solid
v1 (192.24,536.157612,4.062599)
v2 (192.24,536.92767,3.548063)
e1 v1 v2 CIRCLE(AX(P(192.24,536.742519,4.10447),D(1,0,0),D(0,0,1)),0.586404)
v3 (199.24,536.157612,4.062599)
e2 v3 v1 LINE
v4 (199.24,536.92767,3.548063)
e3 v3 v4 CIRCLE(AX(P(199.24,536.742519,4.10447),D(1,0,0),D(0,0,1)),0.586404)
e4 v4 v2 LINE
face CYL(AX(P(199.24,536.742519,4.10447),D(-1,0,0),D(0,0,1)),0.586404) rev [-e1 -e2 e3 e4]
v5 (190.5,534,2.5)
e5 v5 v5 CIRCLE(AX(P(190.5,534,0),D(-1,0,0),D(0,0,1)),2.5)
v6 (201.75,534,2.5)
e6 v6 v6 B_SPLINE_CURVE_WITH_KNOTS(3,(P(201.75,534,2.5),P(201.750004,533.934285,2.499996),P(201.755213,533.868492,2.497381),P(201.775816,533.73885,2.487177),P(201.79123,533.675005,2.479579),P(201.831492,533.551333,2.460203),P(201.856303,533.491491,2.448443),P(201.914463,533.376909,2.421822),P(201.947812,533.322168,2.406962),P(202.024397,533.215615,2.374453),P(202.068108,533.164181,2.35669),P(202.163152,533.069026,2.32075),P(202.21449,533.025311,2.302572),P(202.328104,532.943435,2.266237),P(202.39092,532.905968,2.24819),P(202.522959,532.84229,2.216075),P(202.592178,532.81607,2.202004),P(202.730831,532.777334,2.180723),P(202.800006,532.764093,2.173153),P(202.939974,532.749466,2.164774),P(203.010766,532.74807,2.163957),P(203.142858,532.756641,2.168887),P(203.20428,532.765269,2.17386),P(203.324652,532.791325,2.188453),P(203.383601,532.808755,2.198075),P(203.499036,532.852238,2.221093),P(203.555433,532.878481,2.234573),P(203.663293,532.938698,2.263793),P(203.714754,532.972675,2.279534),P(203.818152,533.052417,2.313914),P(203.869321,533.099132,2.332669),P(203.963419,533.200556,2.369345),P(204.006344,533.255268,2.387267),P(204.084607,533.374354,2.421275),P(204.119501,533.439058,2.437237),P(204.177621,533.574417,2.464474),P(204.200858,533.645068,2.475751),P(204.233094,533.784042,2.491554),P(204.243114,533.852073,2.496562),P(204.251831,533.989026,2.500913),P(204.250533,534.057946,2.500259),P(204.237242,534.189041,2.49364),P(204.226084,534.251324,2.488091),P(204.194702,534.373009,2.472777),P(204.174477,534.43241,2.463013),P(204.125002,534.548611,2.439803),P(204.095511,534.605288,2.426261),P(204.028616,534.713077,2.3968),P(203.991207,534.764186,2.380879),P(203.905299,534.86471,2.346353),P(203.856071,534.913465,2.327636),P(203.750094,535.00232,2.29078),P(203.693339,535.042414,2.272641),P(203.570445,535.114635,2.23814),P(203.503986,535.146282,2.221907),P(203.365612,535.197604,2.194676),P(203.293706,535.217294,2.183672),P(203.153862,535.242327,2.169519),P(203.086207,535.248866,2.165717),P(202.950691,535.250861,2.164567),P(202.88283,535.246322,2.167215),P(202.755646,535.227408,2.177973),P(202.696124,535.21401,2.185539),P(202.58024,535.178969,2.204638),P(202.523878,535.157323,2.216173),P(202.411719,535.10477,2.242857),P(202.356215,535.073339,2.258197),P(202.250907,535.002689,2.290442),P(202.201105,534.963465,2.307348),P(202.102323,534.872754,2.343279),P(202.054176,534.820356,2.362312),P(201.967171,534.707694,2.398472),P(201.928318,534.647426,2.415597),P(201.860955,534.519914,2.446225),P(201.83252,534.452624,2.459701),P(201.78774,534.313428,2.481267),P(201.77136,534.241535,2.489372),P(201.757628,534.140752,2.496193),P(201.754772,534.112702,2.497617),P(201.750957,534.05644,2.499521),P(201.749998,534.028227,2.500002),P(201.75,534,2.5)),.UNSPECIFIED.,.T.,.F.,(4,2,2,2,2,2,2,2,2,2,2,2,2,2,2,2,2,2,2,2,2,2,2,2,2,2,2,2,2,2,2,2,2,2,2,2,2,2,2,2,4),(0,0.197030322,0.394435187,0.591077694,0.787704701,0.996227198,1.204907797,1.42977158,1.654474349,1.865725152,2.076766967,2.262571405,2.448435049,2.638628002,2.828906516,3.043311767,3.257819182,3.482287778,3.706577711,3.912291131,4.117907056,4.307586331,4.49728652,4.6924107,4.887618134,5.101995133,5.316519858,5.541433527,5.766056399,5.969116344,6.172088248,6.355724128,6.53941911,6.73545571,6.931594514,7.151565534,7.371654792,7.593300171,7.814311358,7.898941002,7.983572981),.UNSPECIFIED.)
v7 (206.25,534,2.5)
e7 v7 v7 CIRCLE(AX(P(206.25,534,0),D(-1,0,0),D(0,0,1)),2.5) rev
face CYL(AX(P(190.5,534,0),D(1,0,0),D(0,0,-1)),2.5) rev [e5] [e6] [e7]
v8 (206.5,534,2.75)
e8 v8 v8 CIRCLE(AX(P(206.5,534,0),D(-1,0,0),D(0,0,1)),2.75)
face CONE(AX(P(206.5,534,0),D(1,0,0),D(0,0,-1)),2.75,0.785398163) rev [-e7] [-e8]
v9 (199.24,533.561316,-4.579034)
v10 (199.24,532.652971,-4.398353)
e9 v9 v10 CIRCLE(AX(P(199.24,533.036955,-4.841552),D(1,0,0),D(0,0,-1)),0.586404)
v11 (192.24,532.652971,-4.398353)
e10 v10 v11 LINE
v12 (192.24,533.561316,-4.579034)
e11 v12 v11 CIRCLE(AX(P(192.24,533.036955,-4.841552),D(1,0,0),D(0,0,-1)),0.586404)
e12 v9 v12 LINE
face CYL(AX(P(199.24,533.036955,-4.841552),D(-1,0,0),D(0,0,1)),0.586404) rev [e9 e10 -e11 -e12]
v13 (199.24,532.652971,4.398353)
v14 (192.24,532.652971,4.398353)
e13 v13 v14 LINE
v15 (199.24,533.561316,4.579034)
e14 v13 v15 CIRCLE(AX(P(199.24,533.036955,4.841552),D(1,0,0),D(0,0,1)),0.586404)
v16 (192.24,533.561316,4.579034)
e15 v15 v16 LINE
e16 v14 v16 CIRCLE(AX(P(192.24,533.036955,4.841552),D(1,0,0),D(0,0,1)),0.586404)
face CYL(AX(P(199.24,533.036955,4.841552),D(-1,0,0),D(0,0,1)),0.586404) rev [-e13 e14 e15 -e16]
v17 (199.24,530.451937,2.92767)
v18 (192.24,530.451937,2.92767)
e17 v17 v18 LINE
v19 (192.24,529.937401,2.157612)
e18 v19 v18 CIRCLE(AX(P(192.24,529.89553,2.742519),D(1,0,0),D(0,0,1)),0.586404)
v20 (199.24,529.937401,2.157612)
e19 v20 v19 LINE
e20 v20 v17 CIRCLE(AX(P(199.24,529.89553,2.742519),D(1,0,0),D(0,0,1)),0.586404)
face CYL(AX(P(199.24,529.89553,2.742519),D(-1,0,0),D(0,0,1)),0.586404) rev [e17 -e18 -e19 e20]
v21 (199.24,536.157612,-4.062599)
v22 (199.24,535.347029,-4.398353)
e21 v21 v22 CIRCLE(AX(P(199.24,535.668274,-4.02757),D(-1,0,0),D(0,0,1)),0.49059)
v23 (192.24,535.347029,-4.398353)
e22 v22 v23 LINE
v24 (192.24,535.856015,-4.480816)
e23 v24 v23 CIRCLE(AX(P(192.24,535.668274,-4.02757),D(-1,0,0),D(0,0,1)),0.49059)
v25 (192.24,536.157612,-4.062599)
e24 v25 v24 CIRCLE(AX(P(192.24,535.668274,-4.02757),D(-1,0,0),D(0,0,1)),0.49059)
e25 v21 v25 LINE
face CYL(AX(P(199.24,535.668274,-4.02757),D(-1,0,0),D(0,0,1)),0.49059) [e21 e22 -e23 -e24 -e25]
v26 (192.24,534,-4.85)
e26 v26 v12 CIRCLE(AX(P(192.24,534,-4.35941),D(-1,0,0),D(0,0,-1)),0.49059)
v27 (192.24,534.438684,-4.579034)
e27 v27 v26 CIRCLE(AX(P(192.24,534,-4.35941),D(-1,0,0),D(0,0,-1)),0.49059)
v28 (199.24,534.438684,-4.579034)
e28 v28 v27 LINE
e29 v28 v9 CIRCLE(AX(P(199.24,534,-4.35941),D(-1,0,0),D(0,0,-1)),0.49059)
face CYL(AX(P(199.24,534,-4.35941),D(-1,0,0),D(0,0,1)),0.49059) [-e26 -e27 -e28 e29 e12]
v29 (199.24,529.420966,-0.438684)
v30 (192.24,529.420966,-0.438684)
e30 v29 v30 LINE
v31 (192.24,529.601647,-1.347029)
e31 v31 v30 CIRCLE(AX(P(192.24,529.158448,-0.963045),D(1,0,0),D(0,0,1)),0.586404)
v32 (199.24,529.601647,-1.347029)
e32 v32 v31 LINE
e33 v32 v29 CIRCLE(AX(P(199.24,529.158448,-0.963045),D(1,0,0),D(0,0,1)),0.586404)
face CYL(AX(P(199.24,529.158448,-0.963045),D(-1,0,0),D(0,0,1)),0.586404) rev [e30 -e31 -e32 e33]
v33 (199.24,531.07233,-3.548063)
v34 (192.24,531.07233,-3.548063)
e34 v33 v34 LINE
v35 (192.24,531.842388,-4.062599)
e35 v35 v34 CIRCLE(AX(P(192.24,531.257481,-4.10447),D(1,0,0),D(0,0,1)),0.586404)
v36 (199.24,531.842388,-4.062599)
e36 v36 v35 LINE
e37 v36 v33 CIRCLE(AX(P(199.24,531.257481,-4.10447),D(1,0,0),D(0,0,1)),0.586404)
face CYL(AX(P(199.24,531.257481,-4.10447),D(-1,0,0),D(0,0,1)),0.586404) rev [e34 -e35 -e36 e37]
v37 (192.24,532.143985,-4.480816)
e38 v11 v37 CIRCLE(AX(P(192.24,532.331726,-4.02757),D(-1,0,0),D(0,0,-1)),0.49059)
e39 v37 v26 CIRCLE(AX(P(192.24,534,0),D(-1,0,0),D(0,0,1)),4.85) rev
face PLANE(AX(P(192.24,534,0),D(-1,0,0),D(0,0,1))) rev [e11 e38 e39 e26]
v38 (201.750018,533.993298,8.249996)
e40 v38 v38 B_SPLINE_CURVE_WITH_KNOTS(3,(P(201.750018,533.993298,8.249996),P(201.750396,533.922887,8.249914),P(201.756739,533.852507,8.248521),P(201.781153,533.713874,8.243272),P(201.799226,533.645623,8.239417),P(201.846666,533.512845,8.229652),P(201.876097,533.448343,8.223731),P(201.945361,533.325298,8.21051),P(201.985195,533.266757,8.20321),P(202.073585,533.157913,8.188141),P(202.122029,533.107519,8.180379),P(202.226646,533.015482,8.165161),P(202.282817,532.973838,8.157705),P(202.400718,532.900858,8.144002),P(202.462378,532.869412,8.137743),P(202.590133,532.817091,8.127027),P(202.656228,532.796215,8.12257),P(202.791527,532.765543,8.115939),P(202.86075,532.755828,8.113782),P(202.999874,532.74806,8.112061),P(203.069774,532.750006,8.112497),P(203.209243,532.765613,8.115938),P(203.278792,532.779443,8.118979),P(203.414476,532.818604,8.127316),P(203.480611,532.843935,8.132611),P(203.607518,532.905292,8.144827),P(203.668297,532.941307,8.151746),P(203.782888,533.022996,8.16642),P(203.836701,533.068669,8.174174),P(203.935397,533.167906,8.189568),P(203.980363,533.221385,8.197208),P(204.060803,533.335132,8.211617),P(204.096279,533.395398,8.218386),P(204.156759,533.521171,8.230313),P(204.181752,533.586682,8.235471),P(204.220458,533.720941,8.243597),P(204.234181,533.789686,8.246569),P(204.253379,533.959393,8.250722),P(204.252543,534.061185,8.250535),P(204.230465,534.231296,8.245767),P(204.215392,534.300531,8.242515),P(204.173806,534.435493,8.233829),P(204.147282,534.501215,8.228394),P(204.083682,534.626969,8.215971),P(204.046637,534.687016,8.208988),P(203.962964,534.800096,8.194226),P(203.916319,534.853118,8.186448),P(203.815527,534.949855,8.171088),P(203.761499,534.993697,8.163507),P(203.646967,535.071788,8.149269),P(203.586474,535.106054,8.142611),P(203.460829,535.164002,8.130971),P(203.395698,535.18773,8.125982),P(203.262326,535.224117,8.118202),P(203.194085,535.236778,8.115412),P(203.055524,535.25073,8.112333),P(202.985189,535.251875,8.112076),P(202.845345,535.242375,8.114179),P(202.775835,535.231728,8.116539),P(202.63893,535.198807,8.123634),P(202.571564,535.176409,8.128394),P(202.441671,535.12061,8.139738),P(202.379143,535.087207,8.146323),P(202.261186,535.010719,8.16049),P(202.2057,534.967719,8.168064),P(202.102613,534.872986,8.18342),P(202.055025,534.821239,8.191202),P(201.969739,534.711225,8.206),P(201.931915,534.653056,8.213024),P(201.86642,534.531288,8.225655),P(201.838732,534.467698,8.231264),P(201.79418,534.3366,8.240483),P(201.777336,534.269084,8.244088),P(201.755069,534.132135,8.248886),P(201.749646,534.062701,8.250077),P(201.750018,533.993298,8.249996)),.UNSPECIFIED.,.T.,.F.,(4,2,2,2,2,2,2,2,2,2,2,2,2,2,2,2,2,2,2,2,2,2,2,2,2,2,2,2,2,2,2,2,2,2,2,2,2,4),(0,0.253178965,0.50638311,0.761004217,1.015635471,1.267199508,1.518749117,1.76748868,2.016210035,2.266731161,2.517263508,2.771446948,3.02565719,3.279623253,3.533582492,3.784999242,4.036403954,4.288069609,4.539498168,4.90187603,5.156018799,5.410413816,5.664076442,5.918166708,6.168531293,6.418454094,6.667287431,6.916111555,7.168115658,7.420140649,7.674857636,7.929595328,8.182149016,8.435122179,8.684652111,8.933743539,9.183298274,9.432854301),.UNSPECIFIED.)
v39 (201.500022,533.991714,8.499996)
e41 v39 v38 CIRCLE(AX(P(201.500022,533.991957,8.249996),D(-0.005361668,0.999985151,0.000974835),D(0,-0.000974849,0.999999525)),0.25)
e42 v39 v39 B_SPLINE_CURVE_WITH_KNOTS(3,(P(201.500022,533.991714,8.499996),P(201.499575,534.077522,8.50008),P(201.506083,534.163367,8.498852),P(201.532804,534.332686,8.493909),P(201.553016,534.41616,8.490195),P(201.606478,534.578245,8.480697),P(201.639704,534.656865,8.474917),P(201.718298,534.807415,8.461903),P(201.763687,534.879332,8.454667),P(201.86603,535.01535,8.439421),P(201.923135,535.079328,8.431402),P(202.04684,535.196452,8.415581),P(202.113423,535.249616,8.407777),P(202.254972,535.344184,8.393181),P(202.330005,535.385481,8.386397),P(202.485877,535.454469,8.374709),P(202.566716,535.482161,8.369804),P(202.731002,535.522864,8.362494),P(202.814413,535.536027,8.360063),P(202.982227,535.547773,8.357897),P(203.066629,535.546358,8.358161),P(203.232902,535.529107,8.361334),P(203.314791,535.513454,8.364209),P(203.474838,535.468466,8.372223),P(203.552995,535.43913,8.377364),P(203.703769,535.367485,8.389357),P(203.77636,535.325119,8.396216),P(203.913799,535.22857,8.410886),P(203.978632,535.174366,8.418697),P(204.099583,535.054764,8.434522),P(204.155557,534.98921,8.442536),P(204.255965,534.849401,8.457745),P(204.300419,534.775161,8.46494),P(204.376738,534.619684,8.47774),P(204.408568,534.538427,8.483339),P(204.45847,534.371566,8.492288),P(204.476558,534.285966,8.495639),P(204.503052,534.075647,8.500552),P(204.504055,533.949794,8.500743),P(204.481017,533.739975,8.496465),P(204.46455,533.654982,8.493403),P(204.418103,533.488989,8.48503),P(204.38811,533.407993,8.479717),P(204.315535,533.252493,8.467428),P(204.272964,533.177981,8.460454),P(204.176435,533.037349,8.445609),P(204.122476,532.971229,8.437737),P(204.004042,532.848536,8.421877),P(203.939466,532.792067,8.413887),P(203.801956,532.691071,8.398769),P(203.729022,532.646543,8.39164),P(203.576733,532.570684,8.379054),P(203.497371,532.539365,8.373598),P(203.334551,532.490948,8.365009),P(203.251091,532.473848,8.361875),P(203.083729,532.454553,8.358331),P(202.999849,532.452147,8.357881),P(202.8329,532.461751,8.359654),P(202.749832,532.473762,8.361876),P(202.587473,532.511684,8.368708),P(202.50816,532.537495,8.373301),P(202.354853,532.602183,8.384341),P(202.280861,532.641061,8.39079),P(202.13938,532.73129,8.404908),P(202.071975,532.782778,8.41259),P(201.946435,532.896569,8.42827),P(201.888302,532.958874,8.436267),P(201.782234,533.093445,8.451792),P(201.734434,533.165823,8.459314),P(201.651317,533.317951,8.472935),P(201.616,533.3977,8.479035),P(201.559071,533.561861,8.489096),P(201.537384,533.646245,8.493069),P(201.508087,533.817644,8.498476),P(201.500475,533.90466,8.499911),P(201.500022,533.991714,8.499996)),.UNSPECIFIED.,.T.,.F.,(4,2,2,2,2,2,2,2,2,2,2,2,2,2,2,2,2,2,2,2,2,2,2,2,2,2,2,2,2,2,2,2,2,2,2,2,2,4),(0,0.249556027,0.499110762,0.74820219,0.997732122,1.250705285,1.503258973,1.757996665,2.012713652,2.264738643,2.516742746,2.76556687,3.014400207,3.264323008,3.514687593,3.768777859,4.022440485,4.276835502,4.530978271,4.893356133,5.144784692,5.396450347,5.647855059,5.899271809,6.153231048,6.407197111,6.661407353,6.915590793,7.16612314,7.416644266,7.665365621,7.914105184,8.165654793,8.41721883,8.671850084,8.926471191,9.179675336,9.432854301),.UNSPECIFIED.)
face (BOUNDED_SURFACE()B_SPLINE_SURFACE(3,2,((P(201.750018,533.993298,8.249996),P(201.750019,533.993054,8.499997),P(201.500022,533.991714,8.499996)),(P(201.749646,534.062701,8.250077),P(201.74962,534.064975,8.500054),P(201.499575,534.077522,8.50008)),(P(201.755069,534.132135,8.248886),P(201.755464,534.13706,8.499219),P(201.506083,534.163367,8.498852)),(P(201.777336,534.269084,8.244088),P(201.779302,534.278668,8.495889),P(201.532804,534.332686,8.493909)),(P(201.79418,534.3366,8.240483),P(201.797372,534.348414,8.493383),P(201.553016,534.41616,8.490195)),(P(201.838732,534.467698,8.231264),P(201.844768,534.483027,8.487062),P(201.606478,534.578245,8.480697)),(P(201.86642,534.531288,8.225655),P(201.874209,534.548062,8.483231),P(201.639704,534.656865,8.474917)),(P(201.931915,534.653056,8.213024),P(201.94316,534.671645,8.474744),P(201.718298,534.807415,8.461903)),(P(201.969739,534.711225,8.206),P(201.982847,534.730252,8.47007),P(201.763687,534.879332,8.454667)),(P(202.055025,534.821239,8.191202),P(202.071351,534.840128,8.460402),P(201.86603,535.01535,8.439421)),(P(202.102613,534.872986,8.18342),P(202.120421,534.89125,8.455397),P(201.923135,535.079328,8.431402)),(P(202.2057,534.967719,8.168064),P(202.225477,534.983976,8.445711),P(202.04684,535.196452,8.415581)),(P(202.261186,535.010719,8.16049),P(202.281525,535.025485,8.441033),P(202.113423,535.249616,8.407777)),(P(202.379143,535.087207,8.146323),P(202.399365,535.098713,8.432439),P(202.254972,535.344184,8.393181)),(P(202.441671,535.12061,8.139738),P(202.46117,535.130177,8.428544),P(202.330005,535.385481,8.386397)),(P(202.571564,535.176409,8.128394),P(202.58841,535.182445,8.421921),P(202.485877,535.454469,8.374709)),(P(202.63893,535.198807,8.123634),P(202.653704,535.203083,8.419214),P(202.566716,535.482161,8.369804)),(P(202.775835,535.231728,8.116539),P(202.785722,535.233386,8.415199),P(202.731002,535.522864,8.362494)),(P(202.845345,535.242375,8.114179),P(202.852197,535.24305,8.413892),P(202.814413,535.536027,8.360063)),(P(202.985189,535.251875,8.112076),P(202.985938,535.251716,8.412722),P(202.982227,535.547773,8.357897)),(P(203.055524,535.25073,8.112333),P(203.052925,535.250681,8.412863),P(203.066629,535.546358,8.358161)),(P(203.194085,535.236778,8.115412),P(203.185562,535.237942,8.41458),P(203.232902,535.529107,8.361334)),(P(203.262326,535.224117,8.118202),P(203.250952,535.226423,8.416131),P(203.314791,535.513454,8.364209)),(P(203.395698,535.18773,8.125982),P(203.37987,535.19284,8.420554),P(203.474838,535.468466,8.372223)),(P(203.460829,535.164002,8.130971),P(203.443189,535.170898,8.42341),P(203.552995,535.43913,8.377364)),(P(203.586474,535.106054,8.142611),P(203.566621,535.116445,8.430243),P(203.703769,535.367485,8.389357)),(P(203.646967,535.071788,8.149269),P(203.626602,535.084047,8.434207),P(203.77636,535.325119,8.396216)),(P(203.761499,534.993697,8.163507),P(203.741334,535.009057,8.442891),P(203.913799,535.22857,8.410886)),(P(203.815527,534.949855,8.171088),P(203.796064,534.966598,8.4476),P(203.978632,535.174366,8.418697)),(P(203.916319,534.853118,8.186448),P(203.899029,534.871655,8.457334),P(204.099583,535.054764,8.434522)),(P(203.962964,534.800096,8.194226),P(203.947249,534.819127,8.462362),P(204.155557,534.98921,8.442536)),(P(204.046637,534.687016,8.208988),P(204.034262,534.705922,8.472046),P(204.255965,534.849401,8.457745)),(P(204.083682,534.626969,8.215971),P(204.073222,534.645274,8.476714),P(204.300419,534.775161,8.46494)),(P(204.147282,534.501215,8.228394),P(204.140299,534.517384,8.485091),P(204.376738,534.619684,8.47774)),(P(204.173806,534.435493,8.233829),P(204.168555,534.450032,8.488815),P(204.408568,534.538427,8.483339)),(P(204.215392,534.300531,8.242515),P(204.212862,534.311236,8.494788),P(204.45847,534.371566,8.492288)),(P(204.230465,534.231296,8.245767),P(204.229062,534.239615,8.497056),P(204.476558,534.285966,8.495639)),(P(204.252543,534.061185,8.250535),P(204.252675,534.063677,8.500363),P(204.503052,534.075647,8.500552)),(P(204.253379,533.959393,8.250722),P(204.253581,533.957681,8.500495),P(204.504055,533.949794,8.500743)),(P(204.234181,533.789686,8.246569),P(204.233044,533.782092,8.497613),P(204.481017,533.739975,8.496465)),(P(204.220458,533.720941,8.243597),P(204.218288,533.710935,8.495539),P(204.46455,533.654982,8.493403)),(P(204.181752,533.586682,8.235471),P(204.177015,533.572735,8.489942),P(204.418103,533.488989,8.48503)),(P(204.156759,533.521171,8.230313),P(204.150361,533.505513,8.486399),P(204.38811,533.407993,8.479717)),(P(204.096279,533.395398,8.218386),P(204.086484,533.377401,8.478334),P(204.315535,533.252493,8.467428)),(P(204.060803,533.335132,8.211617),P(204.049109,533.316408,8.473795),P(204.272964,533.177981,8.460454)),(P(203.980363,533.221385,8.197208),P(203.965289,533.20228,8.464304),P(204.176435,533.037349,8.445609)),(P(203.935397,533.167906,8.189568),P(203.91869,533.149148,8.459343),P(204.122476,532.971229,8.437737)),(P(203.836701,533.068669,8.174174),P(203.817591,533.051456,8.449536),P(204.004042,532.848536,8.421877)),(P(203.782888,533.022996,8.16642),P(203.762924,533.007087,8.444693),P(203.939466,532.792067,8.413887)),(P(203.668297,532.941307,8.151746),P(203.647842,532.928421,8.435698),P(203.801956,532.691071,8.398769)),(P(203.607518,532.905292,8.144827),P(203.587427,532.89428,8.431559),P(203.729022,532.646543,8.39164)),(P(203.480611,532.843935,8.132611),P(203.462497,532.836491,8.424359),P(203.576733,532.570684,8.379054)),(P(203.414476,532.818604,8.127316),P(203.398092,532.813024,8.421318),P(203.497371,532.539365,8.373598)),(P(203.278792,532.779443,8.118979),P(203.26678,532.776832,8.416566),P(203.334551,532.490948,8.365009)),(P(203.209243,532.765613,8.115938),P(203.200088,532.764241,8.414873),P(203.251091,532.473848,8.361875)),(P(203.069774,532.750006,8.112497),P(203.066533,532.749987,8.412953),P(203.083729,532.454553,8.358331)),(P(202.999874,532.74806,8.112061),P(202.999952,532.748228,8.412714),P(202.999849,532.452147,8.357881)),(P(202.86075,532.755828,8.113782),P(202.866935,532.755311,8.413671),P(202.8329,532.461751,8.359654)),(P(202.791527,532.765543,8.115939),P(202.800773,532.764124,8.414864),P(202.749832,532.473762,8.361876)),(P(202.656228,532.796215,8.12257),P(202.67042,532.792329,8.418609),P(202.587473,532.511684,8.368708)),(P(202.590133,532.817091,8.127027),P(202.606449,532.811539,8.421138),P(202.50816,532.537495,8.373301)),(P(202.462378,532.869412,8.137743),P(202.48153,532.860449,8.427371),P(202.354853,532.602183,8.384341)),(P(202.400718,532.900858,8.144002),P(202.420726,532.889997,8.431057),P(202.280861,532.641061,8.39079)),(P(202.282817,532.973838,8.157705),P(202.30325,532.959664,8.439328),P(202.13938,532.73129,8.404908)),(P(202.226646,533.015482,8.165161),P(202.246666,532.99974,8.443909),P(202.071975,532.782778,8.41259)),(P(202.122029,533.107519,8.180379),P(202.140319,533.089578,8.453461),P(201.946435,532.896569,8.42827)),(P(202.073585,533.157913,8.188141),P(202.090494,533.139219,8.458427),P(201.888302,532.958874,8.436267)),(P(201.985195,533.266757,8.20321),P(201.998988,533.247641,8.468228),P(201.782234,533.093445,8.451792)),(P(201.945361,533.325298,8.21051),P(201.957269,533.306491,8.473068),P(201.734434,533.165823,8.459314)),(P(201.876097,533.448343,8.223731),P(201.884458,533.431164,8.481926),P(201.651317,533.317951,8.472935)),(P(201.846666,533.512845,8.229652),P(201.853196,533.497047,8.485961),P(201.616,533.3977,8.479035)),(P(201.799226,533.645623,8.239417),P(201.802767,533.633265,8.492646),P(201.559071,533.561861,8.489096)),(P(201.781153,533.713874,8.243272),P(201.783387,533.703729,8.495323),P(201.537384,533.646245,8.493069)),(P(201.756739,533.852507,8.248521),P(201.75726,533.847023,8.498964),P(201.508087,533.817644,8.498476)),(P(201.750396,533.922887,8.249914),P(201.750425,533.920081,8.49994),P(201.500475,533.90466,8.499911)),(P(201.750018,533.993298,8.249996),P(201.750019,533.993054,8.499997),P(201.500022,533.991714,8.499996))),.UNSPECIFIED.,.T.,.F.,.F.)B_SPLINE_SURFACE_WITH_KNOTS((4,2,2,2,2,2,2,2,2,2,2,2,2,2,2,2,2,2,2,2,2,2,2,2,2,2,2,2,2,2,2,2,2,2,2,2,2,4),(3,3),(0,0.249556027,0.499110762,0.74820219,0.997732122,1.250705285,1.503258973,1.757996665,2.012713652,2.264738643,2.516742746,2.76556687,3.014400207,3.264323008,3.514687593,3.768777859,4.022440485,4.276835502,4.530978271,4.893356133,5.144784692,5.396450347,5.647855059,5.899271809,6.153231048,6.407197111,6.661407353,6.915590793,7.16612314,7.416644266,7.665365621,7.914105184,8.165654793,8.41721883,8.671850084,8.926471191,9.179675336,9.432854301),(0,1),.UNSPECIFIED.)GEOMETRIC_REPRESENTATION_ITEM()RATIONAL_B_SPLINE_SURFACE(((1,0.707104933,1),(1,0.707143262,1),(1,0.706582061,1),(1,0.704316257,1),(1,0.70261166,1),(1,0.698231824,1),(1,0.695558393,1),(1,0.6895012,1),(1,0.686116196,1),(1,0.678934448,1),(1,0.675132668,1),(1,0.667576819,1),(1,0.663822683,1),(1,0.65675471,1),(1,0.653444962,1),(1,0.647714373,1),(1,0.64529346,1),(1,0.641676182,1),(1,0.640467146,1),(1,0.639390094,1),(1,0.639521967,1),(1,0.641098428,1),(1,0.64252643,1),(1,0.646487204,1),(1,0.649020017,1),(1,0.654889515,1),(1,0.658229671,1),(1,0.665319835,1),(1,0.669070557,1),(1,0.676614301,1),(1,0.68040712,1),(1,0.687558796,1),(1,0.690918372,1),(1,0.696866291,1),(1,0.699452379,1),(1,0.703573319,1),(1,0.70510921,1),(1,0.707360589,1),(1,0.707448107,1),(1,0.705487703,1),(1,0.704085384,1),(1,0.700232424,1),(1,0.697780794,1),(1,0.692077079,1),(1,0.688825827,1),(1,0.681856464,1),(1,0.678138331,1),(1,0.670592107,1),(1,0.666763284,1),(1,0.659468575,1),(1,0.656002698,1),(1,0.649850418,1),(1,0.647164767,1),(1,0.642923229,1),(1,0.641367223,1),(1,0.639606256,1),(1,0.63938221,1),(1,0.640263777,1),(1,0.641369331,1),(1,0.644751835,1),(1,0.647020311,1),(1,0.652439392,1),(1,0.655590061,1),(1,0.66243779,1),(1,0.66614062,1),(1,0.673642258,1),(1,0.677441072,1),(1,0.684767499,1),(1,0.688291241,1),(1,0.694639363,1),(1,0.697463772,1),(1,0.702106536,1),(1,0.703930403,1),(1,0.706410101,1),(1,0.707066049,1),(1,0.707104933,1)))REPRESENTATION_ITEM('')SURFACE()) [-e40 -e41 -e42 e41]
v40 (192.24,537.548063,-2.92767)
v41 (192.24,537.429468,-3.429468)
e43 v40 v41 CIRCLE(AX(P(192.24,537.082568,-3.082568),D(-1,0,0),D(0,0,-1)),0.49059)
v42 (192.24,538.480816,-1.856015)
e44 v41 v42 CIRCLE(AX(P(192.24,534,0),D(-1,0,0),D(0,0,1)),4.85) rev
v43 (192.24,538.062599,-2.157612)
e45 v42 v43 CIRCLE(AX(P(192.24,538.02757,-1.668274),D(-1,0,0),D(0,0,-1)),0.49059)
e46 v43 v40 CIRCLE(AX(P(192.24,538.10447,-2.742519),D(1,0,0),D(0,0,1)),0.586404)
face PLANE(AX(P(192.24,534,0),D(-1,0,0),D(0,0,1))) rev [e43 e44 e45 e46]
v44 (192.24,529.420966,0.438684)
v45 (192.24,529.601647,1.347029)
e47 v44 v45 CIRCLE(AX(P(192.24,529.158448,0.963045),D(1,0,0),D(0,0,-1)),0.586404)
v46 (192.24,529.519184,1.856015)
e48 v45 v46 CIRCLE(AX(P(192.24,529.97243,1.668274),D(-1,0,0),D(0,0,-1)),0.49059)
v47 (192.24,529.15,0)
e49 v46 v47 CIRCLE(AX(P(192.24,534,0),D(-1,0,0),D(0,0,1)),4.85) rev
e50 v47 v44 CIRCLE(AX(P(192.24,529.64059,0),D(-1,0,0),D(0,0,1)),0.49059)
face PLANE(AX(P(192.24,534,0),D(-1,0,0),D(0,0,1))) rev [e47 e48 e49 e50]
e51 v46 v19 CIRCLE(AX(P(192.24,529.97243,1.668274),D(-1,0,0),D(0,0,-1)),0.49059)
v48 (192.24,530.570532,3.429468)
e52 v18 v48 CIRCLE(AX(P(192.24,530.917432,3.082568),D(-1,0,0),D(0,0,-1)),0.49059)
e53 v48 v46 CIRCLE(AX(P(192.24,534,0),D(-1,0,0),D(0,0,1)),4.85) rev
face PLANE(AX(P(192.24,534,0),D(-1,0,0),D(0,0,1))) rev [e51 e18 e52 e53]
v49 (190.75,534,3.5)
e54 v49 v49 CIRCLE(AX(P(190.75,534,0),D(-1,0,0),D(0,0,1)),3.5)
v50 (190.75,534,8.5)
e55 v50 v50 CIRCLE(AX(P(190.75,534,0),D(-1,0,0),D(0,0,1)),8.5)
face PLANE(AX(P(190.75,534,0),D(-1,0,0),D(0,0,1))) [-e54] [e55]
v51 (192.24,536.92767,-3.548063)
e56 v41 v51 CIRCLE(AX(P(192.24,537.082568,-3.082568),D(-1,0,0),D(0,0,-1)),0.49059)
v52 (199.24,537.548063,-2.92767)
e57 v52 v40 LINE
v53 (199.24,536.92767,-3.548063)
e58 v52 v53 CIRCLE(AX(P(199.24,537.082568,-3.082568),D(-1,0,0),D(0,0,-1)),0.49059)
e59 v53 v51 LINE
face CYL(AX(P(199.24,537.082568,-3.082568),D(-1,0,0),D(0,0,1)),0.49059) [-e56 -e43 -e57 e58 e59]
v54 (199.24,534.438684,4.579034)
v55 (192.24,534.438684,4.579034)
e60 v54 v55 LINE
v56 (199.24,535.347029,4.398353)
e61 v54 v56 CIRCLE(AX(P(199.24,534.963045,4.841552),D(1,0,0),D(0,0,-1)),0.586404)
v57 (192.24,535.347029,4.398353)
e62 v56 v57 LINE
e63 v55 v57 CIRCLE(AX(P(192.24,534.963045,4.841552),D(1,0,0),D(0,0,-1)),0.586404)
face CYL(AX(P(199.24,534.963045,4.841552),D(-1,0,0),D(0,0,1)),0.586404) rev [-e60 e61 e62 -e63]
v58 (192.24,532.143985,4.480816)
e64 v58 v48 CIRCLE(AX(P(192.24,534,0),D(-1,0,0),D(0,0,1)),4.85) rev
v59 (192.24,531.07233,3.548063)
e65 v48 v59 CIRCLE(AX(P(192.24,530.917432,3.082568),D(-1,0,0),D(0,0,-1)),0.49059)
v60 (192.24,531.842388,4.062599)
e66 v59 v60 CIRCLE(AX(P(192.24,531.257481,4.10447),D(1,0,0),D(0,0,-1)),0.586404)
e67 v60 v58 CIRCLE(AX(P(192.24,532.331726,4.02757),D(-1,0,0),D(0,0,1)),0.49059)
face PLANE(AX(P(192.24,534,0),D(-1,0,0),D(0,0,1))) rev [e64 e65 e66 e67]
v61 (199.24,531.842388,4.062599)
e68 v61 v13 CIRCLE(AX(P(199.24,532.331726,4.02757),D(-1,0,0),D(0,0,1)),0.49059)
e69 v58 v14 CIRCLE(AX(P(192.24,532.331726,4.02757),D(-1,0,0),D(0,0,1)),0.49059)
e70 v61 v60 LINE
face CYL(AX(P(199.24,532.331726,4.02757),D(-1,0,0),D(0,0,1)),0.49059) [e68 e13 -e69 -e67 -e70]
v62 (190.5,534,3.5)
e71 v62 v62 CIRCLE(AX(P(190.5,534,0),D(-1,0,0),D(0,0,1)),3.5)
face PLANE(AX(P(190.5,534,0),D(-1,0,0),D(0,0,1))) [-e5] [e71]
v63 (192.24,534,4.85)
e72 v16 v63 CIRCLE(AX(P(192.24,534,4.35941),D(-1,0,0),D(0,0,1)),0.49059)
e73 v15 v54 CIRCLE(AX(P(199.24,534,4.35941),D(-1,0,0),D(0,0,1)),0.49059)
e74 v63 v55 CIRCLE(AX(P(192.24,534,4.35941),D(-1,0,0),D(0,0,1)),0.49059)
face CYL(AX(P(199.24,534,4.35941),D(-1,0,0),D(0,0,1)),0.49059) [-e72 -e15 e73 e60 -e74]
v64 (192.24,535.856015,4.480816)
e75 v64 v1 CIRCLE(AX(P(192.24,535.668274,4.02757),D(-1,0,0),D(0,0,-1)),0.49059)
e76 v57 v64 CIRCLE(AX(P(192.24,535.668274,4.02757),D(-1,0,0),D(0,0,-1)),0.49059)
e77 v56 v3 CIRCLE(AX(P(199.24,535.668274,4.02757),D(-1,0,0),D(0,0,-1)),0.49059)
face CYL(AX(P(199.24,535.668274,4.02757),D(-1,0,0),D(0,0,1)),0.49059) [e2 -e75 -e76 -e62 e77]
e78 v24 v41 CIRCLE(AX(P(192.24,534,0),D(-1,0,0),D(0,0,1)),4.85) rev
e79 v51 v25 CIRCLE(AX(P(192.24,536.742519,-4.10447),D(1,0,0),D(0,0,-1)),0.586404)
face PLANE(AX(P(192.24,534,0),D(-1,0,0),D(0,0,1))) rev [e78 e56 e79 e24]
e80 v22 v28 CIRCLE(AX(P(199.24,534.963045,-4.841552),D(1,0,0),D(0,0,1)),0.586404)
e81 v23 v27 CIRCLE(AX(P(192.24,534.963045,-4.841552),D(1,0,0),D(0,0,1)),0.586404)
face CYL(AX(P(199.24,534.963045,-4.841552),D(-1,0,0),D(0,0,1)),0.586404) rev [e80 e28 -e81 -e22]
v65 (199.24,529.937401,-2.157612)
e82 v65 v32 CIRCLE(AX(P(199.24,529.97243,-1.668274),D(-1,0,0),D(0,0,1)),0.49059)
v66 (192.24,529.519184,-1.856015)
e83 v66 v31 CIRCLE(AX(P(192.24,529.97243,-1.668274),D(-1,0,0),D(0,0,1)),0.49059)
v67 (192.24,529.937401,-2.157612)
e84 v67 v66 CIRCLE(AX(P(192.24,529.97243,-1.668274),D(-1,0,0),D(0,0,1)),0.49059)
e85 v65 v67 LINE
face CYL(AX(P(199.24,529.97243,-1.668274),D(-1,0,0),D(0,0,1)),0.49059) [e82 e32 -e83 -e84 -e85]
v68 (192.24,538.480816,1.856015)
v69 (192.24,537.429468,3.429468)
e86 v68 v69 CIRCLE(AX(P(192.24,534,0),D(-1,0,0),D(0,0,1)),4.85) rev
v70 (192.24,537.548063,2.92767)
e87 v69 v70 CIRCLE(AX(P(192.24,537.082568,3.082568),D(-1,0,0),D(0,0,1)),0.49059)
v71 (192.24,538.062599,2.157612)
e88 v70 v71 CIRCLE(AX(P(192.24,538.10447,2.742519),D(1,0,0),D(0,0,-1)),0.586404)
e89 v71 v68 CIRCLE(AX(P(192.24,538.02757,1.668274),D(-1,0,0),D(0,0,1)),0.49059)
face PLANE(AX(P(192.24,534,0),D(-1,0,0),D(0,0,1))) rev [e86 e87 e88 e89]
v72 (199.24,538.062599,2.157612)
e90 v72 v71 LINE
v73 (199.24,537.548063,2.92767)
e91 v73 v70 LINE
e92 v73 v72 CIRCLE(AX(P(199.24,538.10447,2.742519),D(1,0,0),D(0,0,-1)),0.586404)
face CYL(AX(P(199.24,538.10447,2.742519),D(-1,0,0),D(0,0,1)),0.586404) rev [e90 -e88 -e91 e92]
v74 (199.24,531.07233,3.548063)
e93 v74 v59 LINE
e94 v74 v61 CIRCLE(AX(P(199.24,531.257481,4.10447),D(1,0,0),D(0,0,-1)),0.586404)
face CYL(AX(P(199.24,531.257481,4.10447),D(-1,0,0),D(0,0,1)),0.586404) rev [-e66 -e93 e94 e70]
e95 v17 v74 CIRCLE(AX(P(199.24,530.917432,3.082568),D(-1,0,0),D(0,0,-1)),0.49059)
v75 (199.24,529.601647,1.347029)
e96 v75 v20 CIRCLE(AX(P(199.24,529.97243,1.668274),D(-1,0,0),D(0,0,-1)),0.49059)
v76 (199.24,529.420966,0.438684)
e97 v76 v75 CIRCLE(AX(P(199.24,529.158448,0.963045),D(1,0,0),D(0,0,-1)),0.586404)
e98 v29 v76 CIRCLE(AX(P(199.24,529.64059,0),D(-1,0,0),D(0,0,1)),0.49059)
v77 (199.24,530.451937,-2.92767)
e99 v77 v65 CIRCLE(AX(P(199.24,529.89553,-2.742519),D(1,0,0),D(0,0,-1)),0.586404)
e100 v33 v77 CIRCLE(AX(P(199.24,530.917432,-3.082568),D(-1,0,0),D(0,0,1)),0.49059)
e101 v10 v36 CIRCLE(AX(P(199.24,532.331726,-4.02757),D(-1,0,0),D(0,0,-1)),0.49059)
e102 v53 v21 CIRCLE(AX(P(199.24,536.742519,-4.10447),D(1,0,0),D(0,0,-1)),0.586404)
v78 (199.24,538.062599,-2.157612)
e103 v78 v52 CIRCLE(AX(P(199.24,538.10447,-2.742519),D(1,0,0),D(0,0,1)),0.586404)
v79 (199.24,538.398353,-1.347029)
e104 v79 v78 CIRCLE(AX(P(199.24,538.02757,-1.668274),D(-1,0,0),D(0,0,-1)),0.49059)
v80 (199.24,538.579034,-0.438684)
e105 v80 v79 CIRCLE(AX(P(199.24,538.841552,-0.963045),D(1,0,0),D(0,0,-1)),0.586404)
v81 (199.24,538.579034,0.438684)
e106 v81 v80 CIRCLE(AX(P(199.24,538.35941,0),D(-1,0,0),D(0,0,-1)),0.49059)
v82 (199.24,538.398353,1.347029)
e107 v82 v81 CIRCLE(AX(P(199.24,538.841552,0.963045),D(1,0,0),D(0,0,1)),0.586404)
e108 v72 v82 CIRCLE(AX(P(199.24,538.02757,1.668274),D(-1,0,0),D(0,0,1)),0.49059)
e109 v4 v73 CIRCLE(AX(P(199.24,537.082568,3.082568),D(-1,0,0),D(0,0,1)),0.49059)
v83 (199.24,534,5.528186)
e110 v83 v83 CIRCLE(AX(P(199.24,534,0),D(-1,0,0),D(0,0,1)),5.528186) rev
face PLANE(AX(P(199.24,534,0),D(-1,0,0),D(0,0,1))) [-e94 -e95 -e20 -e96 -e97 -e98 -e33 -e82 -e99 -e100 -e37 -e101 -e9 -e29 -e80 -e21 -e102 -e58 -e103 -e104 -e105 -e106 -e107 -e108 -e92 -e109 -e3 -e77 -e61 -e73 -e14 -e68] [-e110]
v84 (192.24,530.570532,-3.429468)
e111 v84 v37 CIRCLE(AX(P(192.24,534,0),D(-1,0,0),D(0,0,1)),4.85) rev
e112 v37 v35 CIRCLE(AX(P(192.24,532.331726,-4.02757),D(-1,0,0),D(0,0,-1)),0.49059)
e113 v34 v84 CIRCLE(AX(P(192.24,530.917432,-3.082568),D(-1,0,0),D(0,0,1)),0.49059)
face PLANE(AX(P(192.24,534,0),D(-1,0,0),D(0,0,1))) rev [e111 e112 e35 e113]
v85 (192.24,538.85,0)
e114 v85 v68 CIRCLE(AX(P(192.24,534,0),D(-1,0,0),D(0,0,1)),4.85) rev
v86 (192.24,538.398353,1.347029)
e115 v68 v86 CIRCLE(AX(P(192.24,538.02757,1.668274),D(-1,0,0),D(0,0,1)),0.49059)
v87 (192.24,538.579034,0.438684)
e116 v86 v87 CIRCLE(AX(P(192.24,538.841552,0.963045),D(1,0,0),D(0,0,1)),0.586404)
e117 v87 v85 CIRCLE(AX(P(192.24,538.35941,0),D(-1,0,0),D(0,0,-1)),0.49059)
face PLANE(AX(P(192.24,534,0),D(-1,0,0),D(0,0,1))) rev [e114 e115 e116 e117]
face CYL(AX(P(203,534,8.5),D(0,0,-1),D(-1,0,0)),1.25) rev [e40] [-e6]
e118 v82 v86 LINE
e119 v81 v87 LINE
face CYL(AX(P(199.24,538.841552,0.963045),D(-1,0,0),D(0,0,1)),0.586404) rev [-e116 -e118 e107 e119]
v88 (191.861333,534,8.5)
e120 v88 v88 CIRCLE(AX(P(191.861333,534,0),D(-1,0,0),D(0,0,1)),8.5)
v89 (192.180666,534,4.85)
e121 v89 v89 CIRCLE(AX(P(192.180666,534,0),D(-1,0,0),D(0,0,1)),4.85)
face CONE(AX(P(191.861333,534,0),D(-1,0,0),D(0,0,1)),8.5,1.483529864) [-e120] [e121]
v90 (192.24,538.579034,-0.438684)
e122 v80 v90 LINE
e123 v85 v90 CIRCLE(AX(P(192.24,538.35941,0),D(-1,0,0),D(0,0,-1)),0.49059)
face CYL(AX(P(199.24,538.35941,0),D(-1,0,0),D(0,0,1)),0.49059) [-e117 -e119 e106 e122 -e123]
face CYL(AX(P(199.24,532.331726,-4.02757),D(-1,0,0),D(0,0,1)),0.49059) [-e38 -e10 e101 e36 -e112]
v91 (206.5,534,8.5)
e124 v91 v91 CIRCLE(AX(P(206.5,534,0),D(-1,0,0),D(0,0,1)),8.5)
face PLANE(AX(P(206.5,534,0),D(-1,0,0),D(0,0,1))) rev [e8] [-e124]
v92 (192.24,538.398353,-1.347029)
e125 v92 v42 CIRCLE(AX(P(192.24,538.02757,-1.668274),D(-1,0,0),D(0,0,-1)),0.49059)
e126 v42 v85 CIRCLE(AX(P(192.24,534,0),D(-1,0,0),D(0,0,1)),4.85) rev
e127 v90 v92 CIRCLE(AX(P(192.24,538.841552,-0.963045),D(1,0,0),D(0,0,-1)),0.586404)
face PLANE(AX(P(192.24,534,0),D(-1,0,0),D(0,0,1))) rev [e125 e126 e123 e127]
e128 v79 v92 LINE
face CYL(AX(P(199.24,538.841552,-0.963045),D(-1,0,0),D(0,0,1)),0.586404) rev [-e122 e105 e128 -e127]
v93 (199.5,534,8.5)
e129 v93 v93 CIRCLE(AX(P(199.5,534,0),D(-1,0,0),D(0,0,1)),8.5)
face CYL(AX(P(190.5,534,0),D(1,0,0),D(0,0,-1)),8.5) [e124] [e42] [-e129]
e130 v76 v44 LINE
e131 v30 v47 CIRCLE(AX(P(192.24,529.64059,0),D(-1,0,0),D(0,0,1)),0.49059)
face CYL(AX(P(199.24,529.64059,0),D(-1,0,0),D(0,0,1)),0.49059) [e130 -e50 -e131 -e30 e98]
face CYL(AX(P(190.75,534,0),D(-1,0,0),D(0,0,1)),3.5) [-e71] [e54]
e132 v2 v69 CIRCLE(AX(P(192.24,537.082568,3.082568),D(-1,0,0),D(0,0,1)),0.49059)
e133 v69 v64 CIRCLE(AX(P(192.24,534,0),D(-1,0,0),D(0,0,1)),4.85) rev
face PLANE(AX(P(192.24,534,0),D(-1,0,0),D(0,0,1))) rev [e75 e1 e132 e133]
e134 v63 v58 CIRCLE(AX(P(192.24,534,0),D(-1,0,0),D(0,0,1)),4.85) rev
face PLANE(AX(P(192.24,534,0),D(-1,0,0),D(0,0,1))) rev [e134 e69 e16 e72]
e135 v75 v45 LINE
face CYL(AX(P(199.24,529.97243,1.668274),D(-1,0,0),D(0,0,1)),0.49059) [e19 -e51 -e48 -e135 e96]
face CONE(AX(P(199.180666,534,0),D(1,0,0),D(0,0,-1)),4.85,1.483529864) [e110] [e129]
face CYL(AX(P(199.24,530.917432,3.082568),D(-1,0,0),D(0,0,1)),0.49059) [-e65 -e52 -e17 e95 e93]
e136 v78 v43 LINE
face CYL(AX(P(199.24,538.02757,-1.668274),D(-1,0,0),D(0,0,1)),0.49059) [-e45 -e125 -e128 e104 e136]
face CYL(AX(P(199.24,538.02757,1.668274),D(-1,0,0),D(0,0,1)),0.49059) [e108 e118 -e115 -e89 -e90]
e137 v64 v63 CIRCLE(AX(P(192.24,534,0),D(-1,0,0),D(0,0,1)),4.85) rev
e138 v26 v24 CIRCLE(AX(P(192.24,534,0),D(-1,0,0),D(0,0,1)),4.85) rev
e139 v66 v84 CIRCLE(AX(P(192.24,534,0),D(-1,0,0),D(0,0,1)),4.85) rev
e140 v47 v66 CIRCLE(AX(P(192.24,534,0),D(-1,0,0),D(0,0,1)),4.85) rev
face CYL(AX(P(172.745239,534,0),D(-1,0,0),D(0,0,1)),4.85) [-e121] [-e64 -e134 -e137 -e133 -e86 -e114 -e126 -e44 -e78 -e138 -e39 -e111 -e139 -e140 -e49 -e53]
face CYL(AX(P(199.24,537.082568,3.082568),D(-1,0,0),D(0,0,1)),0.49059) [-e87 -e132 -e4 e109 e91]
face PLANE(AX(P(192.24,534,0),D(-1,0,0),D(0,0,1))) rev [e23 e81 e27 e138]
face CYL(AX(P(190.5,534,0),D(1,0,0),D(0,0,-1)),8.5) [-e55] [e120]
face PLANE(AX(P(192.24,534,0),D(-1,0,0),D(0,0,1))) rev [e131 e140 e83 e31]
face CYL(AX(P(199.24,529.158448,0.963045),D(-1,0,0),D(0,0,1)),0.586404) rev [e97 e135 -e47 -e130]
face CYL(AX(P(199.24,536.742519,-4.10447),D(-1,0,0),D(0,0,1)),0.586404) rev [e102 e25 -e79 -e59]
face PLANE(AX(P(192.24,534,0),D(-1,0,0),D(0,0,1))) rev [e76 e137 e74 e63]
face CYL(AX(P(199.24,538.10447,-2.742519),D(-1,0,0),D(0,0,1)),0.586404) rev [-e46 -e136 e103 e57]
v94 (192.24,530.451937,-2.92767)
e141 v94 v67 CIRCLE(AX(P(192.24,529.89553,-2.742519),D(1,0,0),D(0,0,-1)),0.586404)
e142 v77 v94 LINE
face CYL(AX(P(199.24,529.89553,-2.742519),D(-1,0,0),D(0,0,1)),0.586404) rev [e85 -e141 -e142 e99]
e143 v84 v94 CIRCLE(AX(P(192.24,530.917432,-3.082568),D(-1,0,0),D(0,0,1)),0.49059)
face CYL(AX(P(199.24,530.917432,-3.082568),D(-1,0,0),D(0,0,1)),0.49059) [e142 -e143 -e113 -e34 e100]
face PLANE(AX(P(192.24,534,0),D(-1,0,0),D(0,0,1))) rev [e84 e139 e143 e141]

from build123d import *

# Parameters (mm, degrees)
SKETCH1_R          = 1.25
CUT_EXTRUDE1_DEPTH = 581.534882673
CUT_EXTRUDE2_START = -0.25
SKETCH2_R          = 8.5
SKETCH2_R_2        = 3.5
CUT_EXTRUDE2_DEPTH = 0.25
CUT_EXTRUDE3_START = -8.49
SKETCH3_R          = 8.5
CUT_EXTRUDE3_DEPTH = 7
FILLET1_R          = 0.25
CHAMFER1_SIZE      = 0.25


# Read off the part's stored shape, not the designer's step: Stock-axis-master-1
with BuildPart() as part:
    # Stock-axis-master-1 outline → Stock-axis-master-1 (revolve)
    with BuildSketch(Plane(origin=(0, 534, 0), x_dir=(0, 1, 0), z_dir=(0, 0, -1))):
        Polygon((8.5, 190.5), (8.5, 191.861332756), (4.85, 192.180666378), (4.85, 199.180666378), (8.5, 199.5), (8.5, 206.5), (2.5, 206.5), (2.5, 190.5), align=None)
    revolve(axis=Axis((0, 534, 0), (1, 0, 0)))

    # Sketch1 → Cut-Extrude1 (cut, through all)
    with BuildSketch(Plane.XY):
        with Locations(Location((203, 534, 0), (0, 0, 180))):
            Circle(SKETCH1_R)
    extrude(amount=CUT_EXTRUDE1_DEPTH, mode=Mode.SUBTRACT)

    # Sketch2 → Cut-Extrude2 (cut)
    with BuildSketch(Plane.ZY.offset(-190.5).offset(CUT_EXTRUDE2_START)):
        with Locations((0, 534)):
            Circle(SKETCH2_R)
        with Locations((0, 534)):
            Circle(SKETCH2_R_2, mode=Mode.SUBTRACT)
    extrude(amount=CUT_EXTRUDE2_DEPTH, mode=Mode.SUBTRACT)

    # Sketch3 → Cut-Extrude3 (cut)
    with BuildSketch(Plane.ZY.offset(-190.75).offset(CUT_EXTRUDE3_START)):
        with Locations((0, 534)):
            Circle(SKETCH3_R)
        with BuildLine():
            ThreePointArc((-0.438684101, 538.579034424), (0, 538.85), (0.438684101, 538.579034424))
            ThreePointArc((0.438684101, 538.579034424), (0.848642901, 538.26641597), (1.347029348, 538.398353321))
            ThreePointArc((1.347029348, 538.398353321), (1.856014647, 538.480815733), (2.157611873, 538.062599046))
            ThreePointArc((2.157611873, 538.062599046), (2.416730514, 537.616892814), (2.92766979, 537.548062795))
            ThreePointArc((2.92766979, 537.548062795), (3.429467889, 537.429467889), (3.548062795, 536.92766979))
            ThreePointArc((3.548062795, 536.92766979), (3.616892814, 536.416730514), (4.062599046, 536.157611873))
            ThreePointArc((4.062599046, 536.157611873), (4.480815733, 535.856014647), (4.398353321, 535.347029348))
            ThreePointArc((4.398353321, 535.347029348), (4.26641597, 534.848642901), (4.579034424, 534.438684101))
            ThreePointArc((4.579034424, 534.438684101), (4.85, 534), (4.579034424, 533.561315899))
            ThreePointArc((4.579034424, 533.561315899), (4.26641597, 533.151357099), (4.398353321, 532.652970652))
            ThreePointArc((4.398353321, 532.652970652), (4.480815733, 532.143985353), (4.062599046, 531.842388127))
            ThreePointArc((4.062599046, 531.842388127), (3.616892814, 531.583269486), (3.548062795, 531.07233021))
            ThreePointArc((3.548062795, 531.07233021), (3.429467889, 530.570532111), (2.92766979, 530.451937205))
            ThreePointArc((2.92766979, 530.451937205), (2.416730514, 530.383107186), (2.157611873, 529.937400954))
            ThreePointArc((2.157611873, 529.937400954), (1.856014647, 529.519184267), (1.347029348, 529.601646679))
            ThreePointArc((1.347029348, 529.601646679), (0.848642901, 529.73358403), (0.438684101, 529.420965576))
            ThreePointArc((0.438684101, 529.420965576), (0, 529.15), (-0.438684101, 529.420965576))
            ThreePointArc((-0.438684101, 529.420965576), (-0.848642901, 529.73358403), (-1.347029348, 529.601646679))
            ThreePointArc((-1.347029348, 529.601646679), (-1.856014647, 529.519184267), (-2.157611873, 529.937400954))
            ThreePointArc((-2.157611873, 529.937400954), (-2.416730514, 530.383107186), (-2.92766979, 530.451937205))
            ThreePointArc((-2.92766979, 530.451937205), (-3.429467889, 530.570532111), (-3.548062795, 531.07233021))
            ThreePointArc((-3.548062795, 531.07233021), (-3.616892814, 531.583269486), (-4.062599046, 531.842388127))
            ThreePointArc((-4.062599046, 531.842388127), (-4.480815733, 532.143985353), (-4.398353321, 532.652970652))
            ThreePointArc((-4.398353321, 532.652970652), (-4.26641597, 533.151357099), (-4.579034424, 533.561315899))
            ThreePointArc((-4.579034424, 533.561315899), (-4.85, 534), (-4.579034424, 534.438684101))
            ThreePointArc((-4.579034424, 534.438684101), (-4.26641597, 534.848642901), (-4.398353321, 535.347029348))
            ThreePointArc((-4.398353321, 535.347029348), (-4.480815733, 535.856014647), (-4.062599046, 536.157611873))
            ThreePointArc((-4.062599046, 536.157611873), (-3.616892814, 536.416730514), (-3.548062795, 536.92766979))
            ThreePointArc((-3.548062795, 536.92766979), (-3.429467889, 537.429467889), (-2.92766979, 537.548062795))
            ThreePointArc((-2.92766979, 537.548062795), (-2.416730514, 537.616892814), (-2.157611873, 538.062599046))
            ThreePointArc((-2.157611873, 538.062599046), (-1.856014647, 538.480815733), (-1.347029348, 538.398353321))
            ThreePointArc((-1.347029348, 538.398353321), (-0.848642901, 538.26641597), (-0.438684101, 538.579034424))
        make_face(mode=Mode.SUBTRACT)
    extrude(amount=CUT_EXTRUDE3_DEPTH, mode=Mode.SUBTRACT)

    # Fillet1
    fillet1_edges = [part.edges().sort_by_distance(p)[0] for p in [
        (204.250000003, 534, 8.500000028),
    ]]
    fillet(fillet1_edges, radius=FILLET1_R)

    # Chamfer1
    chamfer1_edges = [part.edges().sort_by_distance(p)[0] for p in [
        (206.5, 531.5, 0),
    ]]
    chamfer(chamfer1_edges, length=CHAMFER1_SIZE)


solid = part.part
